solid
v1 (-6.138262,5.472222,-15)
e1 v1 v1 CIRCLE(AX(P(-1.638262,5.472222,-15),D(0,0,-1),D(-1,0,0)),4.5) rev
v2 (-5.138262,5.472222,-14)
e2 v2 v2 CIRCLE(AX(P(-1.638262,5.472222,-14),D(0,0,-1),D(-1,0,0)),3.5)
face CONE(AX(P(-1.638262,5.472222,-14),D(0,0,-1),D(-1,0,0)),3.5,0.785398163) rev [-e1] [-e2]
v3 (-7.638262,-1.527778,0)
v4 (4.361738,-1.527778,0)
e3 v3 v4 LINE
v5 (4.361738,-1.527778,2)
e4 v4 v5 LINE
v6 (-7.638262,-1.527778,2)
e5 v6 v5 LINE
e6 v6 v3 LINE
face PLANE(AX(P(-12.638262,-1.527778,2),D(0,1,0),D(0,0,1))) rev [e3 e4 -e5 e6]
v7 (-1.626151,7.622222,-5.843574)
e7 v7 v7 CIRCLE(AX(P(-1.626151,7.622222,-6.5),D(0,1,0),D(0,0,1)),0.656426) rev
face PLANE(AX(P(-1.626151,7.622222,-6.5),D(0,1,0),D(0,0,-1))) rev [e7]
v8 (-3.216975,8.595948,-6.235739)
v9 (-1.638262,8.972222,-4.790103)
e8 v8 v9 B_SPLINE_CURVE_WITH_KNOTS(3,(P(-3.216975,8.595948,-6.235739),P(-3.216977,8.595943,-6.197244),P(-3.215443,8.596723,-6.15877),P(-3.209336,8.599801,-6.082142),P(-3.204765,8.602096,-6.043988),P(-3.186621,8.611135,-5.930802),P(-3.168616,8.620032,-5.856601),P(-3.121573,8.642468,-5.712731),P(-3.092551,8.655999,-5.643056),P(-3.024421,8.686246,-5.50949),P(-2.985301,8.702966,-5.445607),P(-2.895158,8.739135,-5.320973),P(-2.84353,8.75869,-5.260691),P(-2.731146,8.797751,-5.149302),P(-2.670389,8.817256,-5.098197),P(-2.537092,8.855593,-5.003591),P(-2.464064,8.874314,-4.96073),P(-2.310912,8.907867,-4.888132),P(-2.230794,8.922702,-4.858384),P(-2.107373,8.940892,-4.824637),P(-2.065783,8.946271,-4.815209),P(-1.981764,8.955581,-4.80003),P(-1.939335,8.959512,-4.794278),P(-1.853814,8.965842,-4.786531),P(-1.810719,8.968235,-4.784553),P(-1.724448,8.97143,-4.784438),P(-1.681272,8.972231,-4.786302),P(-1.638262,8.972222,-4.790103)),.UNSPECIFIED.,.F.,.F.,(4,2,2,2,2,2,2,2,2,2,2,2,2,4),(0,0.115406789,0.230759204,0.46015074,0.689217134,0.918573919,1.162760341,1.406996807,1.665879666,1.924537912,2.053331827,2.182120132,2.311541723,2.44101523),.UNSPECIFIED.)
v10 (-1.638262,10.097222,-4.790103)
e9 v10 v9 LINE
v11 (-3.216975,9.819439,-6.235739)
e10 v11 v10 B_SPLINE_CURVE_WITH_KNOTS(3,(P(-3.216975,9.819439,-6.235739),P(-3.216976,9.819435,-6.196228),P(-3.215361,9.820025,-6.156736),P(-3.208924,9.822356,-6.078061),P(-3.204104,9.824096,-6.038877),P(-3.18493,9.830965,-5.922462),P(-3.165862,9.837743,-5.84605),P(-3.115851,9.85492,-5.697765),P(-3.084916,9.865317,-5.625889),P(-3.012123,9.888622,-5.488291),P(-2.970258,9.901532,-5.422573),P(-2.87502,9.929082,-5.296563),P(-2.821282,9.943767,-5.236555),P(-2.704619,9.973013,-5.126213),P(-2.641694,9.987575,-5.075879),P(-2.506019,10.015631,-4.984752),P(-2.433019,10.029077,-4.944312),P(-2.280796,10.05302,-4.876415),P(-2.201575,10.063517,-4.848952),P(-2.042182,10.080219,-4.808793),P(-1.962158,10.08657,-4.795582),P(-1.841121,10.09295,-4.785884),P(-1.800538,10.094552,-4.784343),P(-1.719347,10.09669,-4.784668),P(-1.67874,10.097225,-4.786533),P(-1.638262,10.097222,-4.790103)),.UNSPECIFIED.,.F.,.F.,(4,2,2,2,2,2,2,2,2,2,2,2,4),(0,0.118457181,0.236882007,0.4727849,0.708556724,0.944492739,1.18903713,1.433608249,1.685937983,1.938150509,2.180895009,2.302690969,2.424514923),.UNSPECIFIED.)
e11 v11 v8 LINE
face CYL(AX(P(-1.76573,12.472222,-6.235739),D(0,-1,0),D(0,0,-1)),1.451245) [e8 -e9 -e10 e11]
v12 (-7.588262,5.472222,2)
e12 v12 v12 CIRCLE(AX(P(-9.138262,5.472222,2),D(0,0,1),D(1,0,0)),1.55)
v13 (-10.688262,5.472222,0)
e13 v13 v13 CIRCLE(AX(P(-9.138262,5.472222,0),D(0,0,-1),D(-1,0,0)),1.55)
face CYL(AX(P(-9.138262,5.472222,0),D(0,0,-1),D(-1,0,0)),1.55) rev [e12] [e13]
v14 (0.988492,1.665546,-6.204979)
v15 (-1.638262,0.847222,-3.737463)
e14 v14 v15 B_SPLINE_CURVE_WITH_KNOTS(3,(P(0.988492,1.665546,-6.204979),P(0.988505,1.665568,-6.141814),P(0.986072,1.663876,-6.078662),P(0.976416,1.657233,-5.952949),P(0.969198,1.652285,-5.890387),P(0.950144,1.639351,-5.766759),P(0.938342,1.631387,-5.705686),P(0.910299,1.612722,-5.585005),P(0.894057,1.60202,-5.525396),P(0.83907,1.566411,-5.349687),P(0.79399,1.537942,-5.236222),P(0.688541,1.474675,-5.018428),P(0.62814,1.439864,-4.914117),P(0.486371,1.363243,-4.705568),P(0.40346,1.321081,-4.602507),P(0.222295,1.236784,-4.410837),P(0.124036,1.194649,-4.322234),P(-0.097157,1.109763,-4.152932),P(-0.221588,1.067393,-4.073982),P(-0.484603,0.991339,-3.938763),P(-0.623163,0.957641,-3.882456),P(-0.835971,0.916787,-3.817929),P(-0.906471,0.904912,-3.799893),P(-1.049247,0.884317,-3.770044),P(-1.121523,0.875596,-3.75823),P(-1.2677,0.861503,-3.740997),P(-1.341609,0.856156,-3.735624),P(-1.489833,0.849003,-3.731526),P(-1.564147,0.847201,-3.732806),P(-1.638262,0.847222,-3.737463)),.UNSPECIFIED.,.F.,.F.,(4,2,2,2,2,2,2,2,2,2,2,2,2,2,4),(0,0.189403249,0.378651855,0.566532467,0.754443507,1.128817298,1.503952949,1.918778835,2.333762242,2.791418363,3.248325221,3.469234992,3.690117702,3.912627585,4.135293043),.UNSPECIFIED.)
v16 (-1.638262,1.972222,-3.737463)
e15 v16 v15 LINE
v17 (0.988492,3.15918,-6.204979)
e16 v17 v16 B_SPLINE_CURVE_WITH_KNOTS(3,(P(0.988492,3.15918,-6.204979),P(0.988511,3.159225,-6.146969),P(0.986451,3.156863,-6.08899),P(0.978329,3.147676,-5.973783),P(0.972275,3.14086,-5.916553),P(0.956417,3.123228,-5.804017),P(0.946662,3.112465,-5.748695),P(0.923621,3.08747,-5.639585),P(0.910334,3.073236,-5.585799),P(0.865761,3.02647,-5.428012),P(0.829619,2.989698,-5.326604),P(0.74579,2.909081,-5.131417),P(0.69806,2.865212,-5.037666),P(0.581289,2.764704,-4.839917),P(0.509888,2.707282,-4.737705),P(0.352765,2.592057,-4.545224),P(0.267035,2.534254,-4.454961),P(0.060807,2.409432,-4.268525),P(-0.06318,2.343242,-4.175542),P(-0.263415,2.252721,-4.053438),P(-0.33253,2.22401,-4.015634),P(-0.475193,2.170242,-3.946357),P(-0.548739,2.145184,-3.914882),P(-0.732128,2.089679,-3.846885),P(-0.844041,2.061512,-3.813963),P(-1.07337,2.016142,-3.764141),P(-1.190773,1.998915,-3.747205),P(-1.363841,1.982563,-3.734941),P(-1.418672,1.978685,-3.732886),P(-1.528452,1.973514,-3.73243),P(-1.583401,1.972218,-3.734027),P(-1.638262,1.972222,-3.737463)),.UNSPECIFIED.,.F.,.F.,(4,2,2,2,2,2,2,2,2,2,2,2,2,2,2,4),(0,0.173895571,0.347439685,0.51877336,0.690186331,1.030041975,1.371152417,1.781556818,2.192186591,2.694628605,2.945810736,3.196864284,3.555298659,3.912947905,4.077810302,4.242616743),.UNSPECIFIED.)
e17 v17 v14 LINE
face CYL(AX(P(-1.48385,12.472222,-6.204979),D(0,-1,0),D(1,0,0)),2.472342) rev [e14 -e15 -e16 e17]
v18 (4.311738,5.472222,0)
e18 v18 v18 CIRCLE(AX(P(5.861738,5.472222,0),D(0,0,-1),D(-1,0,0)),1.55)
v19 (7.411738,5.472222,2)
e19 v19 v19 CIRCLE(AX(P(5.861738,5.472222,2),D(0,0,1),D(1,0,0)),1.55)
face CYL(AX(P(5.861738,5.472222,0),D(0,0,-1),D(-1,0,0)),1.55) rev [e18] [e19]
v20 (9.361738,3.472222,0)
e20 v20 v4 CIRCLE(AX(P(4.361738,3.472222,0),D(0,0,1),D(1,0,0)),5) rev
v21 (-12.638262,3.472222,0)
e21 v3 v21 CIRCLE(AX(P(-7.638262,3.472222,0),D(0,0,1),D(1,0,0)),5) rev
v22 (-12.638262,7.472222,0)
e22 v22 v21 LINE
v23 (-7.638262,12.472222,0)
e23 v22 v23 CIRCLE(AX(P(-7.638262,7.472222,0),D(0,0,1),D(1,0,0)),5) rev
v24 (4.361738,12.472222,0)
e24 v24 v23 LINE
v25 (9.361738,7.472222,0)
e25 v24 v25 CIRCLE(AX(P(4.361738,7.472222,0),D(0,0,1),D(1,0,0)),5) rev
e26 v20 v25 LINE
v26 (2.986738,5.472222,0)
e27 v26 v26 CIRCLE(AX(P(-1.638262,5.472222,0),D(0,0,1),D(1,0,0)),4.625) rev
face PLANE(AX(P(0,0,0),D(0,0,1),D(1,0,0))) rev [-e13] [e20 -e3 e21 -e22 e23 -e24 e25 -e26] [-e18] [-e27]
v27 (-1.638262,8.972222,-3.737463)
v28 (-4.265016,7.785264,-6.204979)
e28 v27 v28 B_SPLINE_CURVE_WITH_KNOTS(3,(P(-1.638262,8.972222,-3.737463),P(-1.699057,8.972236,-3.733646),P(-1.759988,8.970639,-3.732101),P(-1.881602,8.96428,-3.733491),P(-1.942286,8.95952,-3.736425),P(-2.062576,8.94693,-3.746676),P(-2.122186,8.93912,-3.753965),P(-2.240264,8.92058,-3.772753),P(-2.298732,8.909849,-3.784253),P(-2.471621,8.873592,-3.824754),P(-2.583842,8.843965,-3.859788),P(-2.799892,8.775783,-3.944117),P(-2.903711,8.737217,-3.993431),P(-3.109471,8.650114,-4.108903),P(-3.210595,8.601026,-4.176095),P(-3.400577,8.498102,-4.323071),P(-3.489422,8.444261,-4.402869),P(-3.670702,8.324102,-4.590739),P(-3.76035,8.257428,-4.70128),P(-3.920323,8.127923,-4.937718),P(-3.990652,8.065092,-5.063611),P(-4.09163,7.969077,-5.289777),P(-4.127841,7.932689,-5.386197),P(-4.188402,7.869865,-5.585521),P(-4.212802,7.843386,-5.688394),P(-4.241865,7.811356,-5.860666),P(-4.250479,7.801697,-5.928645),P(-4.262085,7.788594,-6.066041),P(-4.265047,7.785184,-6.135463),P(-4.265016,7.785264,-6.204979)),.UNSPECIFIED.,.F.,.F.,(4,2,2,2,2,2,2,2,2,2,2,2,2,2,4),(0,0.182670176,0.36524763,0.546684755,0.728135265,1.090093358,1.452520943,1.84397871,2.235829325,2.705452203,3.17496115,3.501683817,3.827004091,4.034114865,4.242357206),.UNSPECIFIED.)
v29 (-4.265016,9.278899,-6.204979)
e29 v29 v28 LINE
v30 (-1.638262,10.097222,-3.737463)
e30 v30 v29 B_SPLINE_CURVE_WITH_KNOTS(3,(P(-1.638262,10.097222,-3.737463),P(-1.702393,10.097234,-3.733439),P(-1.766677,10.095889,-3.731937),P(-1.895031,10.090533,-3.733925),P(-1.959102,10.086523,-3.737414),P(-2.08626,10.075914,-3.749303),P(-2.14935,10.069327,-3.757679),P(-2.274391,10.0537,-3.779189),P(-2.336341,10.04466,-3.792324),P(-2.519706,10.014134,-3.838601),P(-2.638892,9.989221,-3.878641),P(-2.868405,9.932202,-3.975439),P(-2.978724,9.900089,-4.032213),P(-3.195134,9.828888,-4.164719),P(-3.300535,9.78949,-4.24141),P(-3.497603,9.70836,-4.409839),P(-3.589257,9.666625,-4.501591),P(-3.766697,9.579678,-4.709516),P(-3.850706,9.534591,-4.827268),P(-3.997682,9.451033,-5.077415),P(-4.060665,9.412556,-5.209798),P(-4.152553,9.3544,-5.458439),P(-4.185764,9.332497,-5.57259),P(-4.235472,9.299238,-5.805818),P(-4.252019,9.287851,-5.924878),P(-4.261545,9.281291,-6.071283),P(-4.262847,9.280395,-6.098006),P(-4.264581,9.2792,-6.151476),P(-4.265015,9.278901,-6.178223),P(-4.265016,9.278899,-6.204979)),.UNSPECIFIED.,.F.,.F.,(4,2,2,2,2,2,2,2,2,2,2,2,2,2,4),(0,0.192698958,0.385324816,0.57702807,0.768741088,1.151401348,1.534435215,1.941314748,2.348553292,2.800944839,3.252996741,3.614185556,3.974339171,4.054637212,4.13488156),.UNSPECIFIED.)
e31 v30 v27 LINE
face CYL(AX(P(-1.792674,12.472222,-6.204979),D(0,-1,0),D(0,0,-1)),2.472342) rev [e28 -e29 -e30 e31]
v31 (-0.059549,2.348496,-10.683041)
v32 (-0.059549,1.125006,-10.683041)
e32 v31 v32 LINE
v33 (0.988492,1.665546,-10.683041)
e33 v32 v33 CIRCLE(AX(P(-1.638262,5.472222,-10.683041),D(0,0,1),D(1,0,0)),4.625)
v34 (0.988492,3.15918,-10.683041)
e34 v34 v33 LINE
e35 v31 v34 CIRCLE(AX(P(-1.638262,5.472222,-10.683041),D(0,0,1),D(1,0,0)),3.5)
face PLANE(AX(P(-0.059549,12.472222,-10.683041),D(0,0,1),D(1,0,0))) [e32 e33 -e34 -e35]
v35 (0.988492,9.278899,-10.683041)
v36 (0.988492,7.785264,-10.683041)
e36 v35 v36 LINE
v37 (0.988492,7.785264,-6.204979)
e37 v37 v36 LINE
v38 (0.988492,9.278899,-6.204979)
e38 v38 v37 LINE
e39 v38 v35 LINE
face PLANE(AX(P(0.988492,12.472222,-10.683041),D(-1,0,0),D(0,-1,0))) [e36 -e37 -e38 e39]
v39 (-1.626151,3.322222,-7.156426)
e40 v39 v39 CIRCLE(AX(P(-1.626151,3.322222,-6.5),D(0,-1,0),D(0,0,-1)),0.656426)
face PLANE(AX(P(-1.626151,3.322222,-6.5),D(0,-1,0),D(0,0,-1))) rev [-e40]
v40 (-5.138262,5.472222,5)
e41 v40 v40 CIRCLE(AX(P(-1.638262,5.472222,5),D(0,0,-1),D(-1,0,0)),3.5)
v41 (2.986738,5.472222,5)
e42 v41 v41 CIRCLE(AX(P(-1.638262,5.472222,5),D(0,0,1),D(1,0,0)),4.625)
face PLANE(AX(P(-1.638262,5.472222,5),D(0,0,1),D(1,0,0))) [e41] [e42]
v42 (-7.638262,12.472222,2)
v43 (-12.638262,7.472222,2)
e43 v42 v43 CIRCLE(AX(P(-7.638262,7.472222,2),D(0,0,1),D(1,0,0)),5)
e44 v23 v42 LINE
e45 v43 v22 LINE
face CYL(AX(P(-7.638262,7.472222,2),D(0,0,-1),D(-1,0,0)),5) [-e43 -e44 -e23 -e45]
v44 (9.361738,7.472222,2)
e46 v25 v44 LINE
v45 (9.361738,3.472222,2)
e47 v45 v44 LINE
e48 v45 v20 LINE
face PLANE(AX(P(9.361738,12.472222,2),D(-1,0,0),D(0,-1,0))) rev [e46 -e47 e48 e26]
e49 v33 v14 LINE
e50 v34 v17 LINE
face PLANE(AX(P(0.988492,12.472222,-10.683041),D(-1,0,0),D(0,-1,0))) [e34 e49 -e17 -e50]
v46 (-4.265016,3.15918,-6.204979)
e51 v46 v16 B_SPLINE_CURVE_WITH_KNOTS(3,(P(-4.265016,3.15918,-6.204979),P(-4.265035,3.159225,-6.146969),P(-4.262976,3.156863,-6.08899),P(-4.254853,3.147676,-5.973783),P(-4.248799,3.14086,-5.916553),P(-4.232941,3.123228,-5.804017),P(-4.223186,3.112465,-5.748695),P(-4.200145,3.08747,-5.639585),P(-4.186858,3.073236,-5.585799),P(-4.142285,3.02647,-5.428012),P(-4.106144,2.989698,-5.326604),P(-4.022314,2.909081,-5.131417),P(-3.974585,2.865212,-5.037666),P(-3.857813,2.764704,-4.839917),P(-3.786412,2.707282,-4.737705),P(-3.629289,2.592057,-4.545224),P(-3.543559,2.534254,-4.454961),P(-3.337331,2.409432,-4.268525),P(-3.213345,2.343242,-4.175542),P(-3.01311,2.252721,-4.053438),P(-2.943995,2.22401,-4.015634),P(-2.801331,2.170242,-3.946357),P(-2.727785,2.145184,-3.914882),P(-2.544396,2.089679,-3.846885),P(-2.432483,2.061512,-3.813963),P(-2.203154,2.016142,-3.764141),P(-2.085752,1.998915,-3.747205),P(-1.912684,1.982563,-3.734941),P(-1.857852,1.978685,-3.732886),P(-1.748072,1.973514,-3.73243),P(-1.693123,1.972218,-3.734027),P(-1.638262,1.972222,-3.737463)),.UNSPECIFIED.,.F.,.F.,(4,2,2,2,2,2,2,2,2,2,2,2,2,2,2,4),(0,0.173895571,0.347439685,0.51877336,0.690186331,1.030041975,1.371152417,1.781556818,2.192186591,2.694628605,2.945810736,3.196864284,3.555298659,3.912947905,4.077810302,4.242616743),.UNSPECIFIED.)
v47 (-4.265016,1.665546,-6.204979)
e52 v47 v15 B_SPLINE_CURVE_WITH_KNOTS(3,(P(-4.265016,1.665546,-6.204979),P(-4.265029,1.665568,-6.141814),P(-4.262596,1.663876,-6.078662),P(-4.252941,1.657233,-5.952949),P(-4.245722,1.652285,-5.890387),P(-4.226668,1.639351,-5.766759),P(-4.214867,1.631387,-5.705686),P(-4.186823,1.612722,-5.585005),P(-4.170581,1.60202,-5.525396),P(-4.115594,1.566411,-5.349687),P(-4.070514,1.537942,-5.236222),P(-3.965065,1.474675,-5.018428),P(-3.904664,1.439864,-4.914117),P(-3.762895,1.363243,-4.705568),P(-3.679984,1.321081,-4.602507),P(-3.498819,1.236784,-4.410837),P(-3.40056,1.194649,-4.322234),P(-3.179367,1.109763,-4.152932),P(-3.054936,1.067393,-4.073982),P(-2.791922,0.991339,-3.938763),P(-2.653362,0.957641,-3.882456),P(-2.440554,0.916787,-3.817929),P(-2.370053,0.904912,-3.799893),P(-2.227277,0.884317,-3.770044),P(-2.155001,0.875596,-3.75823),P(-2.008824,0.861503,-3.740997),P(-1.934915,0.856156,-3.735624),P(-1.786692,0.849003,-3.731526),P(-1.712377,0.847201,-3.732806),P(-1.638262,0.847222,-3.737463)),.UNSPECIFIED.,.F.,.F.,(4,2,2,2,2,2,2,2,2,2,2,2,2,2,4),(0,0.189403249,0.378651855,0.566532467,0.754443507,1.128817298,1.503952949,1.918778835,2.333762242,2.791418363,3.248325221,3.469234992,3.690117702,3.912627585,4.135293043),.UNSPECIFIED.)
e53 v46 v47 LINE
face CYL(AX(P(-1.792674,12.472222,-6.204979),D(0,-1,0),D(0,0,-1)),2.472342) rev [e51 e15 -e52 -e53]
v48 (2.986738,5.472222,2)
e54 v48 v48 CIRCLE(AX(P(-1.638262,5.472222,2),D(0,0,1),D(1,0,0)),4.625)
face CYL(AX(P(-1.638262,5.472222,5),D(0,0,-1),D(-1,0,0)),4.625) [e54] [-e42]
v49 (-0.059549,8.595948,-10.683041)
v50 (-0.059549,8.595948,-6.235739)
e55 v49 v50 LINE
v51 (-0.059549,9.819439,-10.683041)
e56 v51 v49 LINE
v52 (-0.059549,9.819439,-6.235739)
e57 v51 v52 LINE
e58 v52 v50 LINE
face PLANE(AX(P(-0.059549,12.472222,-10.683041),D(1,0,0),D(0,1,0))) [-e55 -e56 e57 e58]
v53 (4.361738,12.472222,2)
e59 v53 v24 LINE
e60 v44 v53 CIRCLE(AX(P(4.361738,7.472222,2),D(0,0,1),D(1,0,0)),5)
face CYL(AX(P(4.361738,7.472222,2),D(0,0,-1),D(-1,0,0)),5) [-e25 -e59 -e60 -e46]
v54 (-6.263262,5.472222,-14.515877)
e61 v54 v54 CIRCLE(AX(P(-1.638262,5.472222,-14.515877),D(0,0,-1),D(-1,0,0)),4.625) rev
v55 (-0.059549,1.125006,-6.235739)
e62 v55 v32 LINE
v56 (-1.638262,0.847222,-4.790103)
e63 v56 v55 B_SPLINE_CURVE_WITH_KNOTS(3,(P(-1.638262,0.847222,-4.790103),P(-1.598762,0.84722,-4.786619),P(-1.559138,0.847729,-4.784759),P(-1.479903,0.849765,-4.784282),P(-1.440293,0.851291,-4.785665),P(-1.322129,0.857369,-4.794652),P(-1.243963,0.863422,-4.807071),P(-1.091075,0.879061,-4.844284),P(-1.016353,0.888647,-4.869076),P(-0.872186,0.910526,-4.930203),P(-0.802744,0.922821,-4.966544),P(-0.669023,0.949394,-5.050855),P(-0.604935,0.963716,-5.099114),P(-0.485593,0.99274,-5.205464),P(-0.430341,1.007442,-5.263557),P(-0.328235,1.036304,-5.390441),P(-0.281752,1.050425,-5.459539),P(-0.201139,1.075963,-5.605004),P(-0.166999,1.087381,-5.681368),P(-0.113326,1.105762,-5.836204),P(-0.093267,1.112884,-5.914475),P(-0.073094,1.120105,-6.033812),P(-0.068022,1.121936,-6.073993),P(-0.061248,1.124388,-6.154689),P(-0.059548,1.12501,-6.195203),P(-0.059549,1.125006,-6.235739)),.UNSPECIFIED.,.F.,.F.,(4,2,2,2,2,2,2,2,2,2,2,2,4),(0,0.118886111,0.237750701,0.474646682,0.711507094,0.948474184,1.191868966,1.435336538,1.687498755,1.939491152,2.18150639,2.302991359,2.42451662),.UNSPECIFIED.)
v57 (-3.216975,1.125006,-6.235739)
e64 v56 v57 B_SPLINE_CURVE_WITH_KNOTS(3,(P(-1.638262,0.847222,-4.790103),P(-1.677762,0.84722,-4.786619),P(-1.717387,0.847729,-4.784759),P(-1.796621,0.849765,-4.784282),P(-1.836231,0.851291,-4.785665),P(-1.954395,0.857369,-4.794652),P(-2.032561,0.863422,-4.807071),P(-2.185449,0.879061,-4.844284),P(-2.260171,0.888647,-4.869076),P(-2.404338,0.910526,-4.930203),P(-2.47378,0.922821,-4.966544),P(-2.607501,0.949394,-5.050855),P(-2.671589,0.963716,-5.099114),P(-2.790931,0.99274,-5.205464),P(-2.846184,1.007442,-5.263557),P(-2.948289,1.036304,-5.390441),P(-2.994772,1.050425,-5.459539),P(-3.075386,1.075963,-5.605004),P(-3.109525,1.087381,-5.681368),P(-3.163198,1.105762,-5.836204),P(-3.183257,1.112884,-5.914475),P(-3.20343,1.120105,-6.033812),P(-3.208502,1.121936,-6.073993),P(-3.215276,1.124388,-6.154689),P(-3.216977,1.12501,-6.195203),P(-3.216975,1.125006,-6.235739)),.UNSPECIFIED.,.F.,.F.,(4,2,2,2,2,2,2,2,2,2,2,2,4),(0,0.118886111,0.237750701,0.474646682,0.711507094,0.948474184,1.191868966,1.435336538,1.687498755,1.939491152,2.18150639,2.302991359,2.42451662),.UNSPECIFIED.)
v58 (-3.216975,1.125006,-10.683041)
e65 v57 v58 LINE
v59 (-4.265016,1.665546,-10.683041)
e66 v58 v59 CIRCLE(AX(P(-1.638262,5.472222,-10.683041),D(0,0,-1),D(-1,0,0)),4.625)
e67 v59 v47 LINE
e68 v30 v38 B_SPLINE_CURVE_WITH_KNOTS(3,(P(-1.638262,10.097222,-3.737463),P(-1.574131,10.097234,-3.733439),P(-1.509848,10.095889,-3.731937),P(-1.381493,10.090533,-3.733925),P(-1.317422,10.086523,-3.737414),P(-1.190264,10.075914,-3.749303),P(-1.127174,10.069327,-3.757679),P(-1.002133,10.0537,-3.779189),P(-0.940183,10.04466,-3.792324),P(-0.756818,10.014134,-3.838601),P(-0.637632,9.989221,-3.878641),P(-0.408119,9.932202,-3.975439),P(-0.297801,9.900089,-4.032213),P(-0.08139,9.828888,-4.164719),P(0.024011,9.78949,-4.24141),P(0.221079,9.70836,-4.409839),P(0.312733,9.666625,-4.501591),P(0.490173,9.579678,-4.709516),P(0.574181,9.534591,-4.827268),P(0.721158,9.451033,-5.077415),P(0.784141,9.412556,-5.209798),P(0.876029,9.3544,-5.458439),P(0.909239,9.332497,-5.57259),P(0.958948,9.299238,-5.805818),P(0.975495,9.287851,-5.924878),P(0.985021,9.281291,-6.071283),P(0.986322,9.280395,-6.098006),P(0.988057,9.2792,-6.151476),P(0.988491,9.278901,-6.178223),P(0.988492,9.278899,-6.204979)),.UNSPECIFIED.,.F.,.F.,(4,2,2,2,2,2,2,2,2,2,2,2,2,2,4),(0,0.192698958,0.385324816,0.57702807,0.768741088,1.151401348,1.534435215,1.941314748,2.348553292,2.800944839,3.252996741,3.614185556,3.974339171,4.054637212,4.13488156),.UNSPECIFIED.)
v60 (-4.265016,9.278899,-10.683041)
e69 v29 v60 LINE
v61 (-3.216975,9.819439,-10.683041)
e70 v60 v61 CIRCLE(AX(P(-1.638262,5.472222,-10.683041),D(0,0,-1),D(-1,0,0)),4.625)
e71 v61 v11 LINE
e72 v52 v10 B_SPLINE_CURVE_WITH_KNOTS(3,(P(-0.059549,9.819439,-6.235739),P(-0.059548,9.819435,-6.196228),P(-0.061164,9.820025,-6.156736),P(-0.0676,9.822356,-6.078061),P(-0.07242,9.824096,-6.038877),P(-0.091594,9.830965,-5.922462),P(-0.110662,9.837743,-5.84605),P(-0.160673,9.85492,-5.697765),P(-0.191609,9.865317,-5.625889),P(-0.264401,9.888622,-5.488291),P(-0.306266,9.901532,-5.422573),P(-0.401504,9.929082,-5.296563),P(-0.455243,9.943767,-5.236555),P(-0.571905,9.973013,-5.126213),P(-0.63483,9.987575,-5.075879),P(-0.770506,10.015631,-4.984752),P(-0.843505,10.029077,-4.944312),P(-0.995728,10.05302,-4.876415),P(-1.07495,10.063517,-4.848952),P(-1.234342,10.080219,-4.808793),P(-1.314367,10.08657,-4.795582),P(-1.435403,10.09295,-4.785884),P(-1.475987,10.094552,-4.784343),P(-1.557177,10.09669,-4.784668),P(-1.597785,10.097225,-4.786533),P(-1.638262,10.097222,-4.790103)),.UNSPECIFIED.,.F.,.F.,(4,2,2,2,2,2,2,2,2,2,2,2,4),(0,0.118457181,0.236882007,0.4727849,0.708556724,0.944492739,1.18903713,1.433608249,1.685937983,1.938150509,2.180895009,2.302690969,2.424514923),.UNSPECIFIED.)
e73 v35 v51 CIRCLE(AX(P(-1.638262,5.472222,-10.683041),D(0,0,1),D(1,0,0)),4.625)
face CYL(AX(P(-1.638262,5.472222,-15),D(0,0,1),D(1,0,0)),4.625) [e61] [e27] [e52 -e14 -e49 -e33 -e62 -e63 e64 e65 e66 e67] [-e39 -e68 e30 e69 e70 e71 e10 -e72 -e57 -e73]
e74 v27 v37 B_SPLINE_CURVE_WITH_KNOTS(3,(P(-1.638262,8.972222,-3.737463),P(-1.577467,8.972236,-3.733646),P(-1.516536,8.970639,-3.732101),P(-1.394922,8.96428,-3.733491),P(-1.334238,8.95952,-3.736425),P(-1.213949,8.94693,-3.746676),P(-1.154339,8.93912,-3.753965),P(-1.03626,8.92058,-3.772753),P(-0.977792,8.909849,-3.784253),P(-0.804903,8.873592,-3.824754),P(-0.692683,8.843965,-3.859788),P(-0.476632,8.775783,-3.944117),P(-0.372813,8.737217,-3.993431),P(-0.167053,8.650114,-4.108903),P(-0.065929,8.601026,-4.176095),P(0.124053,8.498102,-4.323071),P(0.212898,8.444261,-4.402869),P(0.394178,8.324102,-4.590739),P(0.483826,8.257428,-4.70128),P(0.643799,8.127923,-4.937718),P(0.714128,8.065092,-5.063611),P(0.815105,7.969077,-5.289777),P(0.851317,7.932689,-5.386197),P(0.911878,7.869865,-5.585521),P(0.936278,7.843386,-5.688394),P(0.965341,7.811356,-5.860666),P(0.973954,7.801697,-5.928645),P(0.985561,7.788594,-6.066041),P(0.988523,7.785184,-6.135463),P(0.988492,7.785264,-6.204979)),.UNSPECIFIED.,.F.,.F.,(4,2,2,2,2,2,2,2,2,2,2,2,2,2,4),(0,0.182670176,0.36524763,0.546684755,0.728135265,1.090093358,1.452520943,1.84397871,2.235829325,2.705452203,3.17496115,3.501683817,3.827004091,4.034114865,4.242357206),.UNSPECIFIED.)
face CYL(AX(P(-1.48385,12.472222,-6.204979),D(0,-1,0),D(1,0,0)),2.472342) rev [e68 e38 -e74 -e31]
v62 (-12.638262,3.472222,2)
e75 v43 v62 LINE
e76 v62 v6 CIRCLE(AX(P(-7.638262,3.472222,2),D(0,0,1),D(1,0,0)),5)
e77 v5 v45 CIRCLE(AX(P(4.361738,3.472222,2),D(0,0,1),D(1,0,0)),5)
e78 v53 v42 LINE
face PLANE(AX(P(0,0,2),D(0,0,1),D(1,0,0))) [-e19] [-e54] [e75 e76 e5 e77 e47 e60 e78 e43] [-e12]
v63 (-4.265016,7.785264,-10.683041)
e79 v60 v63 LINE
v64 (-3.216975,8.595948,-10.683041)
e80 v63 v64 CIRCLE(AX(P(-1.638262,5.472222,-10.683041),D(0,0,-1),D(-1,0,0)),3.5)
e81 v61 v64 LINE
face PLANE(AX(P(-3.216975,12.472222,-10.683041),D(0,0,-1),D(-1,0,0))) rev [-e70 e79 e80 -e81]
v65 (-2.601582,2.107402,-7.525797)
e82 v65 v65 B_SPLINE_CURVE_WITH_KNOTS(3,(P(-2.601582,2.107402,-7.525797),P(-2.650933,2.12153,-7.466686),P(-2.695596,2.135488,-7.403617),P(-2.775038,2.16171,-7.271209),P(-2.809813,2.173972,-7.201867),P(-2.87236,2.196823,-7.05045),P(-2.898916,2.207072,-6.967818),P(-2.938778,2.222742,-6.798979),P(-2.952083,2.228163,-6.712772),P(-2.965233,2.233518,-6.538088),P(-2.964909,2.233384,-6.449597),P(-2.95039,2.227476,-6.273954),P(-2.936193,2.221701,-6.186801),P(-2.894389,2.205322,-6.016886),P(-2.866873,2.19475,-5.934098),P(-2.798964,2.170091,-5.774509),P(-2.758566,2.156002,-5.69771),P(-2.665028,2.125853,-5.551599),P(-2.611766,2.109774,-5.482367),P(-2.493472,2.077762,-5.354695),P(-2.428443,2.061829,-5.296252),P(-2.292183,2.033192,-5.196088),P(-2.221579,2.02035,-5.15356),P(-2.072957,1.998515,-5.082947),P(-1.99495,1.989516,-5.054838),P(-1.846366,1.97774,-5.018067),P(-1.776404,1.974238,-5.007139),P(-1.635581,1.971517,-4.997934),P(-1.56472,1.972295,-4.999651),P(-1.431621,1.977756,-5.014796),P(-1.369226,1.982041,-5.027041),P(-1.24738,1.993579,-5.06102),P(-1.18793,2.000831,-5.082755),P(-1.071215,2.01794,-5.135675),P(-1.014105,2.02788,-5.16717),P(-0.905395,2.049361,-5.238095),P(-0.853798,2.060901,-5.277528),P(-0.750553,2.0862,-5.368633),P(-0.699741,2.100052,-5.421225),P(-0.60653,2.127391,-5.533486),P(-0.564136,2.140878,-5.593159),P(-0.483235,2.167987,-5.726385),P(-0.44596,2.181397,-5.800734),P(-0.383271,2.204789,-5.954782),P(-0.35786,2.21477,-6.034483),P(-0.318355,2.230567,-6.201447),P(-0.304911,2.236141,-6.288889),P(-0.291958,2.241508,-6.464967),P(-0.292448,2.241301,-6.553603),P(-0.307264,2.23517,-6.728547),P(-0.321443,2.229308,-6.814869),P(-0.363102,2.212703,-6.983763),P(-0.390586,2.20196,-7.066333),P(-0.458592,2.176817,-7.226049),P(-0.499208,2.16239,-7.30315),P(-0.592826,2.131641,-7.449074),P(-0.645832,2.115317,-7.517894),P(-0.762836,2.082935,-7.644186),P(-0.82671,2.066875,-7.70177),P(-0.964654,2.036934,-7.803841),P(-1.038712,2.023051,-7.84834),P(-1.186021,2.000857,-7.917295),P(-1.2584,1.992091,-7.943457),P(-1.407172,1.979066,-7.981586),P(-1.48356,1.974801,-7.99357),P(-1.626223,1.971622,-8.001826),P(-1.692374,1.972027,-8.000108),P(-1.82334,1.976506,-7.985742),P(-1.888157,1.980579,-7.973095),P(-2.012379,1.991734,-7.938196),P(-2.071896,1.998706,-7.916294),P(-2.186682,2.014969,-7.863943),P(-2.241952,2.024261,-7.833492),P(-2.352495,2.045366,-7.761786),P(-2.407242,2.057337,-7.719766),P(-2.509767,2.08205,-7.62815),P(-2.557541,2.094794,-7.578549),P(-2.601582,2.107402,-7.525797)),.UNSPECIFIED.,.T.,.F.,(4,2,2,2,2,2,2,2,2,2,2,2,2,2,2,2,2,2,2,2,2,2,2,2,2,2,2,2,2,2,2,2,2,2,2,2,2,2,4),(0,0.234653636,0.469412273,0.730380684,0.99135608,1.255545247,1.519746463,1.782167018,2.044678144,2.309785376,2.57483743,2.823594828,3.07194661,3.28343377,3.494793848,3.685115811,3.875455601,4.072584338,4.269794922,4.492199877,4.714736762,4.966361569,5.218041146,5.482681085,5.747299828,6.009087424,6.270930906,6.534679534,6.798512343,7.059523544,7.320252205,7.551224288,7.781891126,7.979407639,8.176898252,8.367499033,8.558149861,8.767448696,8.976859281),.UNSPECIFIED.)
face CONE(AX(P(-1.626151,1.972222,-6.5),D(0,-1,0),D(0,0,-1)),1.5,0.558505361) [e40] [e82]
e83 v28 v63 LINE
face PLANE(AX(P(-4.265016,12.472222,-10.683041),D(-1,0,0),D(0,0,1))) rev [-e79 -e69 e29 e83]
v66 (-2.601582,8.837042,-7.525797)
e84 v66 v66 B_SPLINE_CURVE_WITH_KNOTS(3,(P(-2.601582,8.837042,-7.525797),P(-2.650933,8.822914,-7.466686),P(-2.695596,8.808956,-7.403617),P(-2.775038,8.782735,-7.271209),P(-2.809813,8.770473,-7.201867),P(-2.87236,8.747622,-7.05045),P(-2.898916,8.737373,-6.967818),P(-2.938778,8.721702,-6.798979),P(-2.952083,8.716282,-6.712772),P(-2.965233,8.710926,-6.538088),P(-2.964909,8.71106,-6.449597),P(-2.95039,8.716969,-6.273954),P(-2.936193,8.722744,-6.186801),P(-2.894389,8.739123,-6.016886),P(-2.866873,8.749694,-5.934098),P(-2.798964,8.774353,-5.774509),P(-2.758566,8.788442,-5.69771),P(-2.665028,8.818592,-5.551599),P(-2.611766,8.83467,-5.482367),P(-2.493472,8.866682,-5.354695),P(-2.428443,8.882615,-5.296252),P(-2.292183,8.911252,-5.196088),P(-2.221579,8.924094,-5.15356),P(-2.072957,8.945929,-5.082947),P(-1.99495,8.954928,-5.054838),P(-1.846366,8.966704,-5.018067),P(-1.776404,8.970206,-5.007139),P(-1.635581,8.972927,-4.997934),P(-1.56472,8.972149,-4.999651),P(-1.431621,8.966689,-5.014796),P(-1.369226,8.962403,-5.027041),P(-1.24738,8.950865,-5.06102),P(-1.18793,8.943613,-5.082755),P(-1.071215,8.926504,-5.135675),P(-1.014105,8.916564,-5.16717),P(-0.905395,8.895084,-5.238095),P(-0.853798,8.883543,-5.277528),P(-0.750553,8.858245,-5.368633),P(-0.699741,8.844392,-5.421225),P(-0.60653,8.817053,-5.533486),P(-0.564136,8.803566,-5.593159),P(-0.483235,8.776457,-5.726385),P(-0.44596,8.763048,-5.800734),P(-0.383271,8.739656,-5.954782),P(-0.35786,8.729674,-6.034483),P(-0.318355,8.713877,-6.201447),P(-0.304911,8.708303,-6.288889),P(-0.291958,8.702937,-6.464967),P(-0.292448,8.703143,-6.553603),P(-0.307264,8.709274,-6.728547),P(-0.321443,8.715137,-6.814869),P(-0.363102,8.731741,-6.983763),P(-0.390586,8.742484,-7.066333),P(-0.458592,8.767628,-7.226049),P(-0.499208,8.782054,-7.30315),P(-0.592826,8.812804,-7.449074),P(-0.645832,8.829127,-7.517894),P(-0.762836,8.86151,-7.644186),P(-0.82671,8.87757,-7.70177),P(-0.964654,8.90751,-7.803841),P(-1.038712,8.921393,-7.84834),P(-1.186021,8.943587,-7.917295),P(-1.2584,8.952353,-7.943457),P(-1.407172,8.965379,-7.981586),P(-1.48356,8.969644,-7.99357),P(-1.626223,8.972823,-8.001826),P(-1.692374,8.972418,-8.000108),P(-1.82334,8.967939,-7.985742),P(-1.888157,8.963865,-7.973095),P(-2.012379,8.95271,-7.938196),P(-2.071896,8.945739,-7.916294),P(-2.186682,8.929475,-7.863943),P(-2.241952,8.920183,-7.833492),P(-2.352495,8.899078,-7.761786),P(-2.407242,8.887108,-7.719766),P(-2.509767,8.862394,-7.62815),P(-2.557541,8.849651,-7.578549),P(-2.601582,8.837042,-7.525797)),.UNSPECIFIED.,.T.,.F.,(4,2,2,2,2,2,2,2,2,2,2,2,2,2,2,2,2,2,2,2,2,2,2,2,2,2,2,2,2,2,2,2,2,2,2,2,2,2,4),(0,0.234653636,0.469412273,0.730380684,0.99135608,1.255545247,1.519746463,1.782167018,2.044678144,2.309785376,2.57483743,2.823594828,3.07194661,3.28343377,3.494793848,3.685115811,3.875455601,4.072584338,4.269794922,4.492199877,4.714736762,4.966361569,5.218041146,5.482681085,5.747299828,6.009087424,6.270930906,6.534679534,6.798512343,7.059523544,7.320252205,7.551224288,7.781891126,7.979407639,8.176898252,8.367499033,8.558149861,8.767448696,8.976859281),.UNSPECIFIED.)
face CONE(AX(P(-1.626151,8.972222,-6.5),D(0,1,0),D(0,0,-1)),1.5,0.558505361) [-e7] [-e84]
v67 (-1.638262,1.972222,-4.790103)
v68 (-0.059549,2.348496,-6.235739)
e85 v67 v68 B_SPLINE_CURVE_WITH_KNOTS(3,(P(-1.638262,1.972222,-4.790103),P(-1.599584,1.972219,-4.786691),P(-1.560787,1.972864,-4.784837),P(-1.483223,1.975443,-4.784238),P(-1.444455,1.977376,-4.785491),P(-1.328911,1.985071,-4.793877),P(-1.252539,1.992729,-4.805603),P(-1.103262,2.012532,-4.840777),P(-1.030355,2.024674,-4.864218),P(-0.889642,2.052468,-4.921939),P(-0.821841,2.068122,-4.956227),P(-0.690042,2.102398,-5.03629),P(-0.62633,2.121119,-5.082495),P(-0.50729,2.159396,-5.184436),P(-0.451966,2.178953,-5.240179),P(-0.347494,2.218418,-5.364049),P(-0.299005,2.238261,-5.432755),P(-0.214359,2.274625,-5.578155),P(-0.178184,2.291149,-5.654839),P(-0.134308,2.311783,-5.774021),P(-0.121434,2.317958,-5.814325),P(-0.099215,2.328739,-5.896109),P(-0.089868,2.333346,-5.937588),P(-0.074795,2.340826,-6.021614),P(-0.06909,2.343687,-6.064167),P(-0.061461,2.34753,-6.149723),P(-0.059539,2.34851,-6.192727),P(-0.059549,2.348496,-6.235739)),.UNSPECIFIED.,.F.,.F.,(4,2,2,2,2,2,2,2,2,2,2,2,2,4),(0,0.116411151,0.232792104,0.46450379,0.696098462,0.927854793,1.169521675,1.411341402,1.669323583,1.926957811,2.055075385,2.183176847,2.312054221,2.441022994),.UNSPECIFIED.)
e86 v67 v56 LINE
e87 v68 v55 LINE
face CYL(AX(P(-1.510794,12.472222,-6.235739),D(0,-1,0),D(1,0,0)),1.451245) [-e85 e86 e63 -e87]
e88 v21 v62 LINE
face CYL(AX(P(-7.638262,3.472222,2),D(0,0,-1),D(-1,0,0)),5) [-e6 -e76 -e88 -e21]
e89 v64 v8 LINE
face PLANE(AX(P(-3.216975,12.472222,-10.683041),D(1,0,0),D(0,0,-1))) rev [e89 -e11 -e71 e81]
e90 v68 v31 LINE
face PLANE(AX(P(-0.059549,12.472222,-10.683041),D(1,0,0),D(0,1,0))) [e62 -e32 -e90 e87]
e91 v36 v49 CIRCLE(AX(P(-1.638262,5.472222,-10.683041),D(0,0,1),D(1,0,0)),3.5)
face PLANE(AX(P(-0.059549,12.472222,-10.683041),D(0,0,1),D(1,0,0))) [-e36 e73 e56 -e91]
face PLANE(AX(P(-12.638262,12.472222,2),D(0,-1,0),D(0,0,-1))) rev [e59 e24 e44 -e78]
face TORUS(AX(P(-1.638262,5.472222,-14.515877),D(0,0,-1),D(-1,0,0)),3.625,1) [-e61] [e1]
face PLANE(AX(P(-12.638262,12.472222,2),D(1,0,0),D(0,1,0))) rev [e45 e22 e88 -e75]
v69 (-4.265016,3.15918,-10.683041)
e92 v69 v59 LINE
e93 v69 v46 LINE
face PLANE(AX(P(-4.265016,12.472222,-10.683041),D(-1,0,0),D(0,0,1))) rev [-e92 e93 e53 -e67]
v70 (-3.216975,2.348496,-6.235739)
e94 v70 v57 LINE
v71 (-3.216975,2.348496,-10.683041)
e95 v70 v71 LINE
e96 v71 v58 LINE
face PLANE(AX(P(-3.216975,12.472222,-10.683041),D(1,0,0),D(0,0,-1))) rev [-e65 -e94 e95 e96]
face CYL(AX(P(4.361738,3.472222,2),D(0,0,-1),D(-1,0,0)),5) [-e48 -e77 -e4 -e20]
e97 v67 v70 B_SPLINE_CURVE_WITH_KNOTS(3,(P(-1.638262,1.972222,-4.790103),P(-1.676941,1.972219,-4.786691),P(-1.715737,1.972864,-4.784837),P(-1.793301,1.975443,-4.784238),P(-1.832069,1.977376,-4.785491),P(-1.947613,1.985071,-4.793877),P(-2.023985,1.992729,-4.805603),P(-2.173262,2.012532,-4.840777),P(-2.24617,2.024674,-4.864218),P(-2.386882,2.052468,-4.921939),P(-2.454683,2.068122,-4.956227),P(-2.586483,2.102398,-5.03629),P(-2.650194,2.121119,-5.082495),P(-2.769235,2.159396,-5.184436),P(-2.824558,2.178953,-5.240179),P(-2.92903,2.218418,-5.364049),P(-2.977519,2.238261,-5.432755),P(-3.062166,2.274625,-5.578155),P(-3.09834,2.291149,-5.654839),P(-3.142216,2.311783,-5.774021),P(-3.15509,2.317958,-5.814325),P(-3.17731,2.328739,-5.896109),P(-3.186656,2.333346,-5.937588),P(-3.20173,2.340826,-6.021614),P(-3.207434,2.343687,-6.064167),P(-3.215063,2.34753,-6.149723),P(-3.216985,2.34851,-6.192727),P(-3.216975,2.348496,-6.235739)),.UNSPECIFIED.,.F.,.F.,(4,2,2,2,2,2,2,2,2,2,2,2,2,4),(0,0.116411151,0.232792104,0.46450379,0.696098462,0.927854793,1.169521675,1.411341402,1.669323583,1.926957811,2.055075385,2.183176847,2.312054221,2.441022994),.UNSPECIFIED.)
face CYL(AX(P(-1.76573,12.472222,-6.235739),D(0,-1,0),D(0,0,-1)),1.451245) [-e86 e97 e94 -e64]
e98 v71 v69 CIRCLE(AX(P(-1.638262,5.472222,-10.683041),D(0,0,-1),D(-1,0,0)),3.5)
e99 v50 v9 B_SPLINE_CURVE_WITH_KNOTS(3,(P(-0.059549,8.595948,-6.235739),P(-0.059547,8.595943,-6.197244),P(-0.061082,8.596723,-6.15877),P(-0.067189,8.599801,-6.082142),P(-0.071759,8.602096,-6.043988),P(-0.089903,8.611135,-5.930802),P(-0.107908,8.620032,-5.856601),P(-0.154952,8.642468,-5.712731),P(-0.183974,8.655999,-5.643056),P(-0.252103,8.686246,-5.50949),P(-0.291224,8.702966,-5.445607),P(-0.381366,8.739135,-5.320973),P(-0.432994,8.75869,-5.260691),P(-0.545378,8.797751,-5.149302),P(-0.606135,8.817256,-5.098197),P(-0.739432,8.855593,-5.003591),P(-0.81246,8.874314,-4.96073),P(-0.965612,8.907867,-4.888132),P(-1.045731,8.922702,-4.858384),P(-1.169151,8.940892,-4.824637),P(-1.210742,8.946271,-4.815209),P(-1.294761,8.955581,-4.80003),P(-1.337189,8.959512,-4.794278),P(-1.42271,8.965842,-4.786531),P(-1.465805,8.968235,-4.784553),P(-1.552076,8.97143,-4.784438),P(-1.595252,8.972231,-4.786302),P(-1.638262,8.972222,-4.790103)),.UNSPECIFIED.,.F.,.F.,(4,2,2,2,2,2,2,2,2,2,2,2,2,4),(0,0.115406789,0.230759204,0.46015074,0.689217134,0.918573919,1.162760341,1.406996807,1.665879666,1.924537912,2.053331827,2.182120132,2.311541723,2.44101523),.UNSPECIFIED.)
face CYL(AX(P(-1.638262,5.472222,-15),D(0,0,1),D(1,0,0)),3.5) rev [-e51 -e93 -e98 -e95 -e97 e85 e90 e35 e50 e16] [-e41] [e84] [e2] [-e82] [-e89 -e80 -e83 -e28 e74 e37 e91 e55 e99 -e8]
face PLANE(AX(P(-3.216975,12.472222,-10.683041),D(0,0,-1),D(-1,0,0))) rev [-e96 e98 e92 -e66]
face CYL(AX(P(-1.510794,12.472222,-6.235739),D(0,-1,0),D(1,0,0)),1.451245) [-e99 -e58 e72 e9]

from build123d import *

# Parameters (mm, degrees)
ESQUISSE1_W               = 22
ESQUISSE1_H               = 14
BOSS_EXTRU_1_DEPTH        = 2
ESQUISSE3_R               = 4.625
ESQUISSE3_R_2             = 3.5
BOSS_EXTRU_2_DEPTH        = 15
BOSS_EXTRU_3_START        = 3
ESQUISSE5_R               = 4.625
BOSS_EXTRU_3_DEPTH        = 3
ESQUISSE4_R               = 3.5
ENL_V_MAT_EXTRU_1_DEPTH   = 24.243966888
ENL_V_MAT_EXTRU_2_DEPTH   = 21.826081473
CONG_1_R                  = 5
D_GAGEMENT_M2_51_D        = 3.1
D_GAGEMENT_M2_51_DEPTH    = 18.17
D_GAGEMENT_M2_51_TIP      = 0.931333959
CHANFREIN1_SIZE           = 1
CONG_2_R                  = 1
ESQUISSE12_R              = 1.5
BOSS_EXTRU_4_DEPTH        = 1.35
BOSS_EXTRU_4_DRAFT        = -32
SYM_TRIE2_COPY_1_SKETCH_R = 1.5
SYM_TRIE2_COPY_1_DEPTH    = 1.35
SYM_TRIE2_COPY_1_DRAFT    = -32


with BuildPart() as part:
    # Esquisse1 → Boss.-Extru.1 (new body)
    with BuildSketch(Plane.XY):
        with Locations((-1.638262124, 5.472222222)):
            Rectangle(ESQUISSE1_W, ESQUISSE1_H)
    extrude(amount=BOSS_EXTRU_1_DEPTH)

    # Esquisse3 → Boss.-Extru.2 (add)
    with BuildSketch(Plane(origin=(0, 0, 0), x_dir=(-1, 0, 0), z_dir=(0, 0, -1))):
        with Locations(Location((1.638262124, 5.472222222, 0), (0, 0, 180))):
            Circle(ESQUISSE3_R)
        with Locations((1.638262124, 5.472222222)):
            Circle(ESQUISSE3_R_2, mode=Mode.SUBTRACT)
    extrude(amount=BOSS_EXTRU_2_DEPTH)

    # Esquisse5 → Boss.-Extru.3 (add)
    with BuildSketch(Plane.XY.offset(2).offset(BOSS_EXTRU_3_START)):
        with Locations((-1.638262124, 5.472222222)):
            Circle(ESQUISSE5_R)
    extrude(amount=-BOSS_EXTRU_3_DEPTH)

    # Esquisse4 → Enlèv. mat.-Extru.1 (cut, through all)
    with BuildSketch(Plane(origin=(0, 0, 0), x_dir=(-1, 0, 0), z_dir=(0, 0, -1))):
        with Locations((1.638262124, 5.472222222)):
            Circle(ESQUISSE4_R)
    extrude(amount=-ENL_V_MAT_EXTRU_1_DEPTH, mode=Mode.SUBTRACT)

    # Esquisse6 → Enlèv. mat.-Extru.2 (cut, symmetric)
    with BuildSketch(Plane(origin=(0, 5.472222222, 0), x_dir=(-1, 0, 0), z_dir=(0, -1, 0))):
        with BuildLine():
            Line((3.21697524, 10.683041), (4.265016312, 10.683041))
            Line((4.265016312, 10.683041), (4.265016312, 6.204978645))
            ThreePointArc((4.265016312, 6.204978645), (3.485411067, 4.403002531), (1.638262124, 3.737462868))
            Line((1.638262124, 3.737462868), (1.638262124, 4.790102764))
            ThreePointArc((1.638262124, 4.790102764), (2.74581304, 5.165435363), (3.21697524, 6.235738952))
            Line((3.21697524, 6.235738952), (3.21697524, 10.683041))
        make_face()
    enl_v_mat_extru_2 = extrude(amount=ENL_V_MAT_EXTRU_2_DEPTH, both=True, mode=Mode.SUBTRACT)

    # Symétrie1: Enlèv. mat.-Extru.2 across plane
    add(enl_v_mat_extru_2.mirror(Plane.ZY.offset(1.638262124)), mode=Mode.SUBTRACT)

    # Congé1
    cong_1_edges = [part.edges().sort_by_distance(p)[0] for p in [
        (-12.638262124, 12.472222222, 1),
        (9.361737876, 12.472222222, 1),
        (9.361737876, -1.527777778, 1),
        (-12.638262124, -1.527777778, 1),
    ]]
    fillet(cong_1_edges, radius=CONG_1_R)

    # Dégagement M2.51
    with Locations(Plane(origin=(0, 0, 0), x_dir=(-1, 0, 0), z_dir=(0, 0, -1))):
        with Locations((-5.861737876, 5.472222222), (9.138262124, 5.472222222)):
            Hole(D_GAGEMENT_M2_51_D / 2, depth=D_GAGEMENT_M2_51_DEPTH)
            with Locations((0, 0, -(D_GAGEMENT_M2_51_DEPTH + D_GAGEMENT_M2_51_TIP / 2))):  # 118° drill point
                Cone(0, D_GAGEMENT_M2_51_D / 2, D_GAGEMENT_M2_51_TIP, mode=Mode.SUBTRACT)

    # Chanfrein1
    chanfrein1_edges = [part.edges().sort_by_distance(p)[0] for p in [
        (1.861737876, 5.472222222, -15),
    ]]
    chamfer(chanfrein1_edges, length=CHANFREIN1_SIZE)

    # Congé2
    # the kernel refuses this fillet: 1 mm, written as the material it takes off along each edge
    with BuildSketch(Plane(origin=(-1.638262124, 5.472222222, -15), x_dir=(1, 0, 0), z_dir=(0, 1, 0))) as cong_2_piece_1:
        with BuildLine():
            CenterArc((3.625, -0.484122918), CONG_2_R, 0, 28.955024372)
            Line((4.625, -0.484122918), (4.645, -0.484122918))
            Line((4.645, -0.484122918), (4.645, 0))
            Line((4.645, 0), (4.625, 0.02))
            ThreePointArc((4.625, 0.02), (4.5625, 0.02), (4.5175, 0.009682458))
            Line((4.5175, 0.009682458), (4.5, 0))
        make_face()
    revolve(axis=Axis((-1.638262124, 5.472222222, -15), (0, 0, -1)), mode=Mode.SUBTRACT)


with BuildPart() as boss_extru_4_tool:
    # Esquisse12 → Boss.-Extru.4 (with draft: the straight prism first)
    with BuildSketch(Plane(origin=(0, 1.972222222, 0), x_dir=(-1, 0, 0), z_dir=(0, -1, 0))):
        with Locations((1.626150822, 6.5)):
            Circle(ESQUISSE12_R)
    extrude(amount=-BOSS_EXTRU_4_DEPTH)
    # Boss.-Extru.4: the draft: its side faces are tilted about the plane it starts from
    boss_extru_4_sides = [boss_extru_4_tool.faces().sort_by_distance(p)[0] for p in [
        (-0.126150822, 2.647222222, -6.5),
    ]]
    draft(boss_extru_4_sides, Plane(origin=(0, 1.972222222, 0), x_dir=(-1, 0, 0), z_dir=(0, -1, 0)), BOSS_EXTRU_4_DRAFT)


with BuildPart() as part_1:
    add(part.part)

    # Boss.-Extru.4: add boss_extru_4_tool
    add(boss_extru_4_tool.part)


with BuildPart() as sym_trie2_copy_1_tool:
    # Symétrie2 copy 1 sketch → Symétrie2 copy 1 (with draft: the straight prism first)
    with BuildSketch(Plane(origin=(0, 8.972222222, 0), x_dir=(-1, 0, 0), z_dir=(0, 1, 0))):
        with Locations((1.626150822, -6.5)):
            Circle(SYM_TRIE2_COPY_1_SKETCH_R)
    extrude(amount=-SYM_TRIE2_COPY_1_DEPTH)
    # Symétrie2 copy 1: the draft: its side faces are tilted about the plane it starts from
    sym_trie2_copy_1_sides = [sym_trie2_copy_1_tool.faces().sort_by_distance(p)[0] for p in [
        (-0.126150822, 8.297222222, -6.5),
    ]]
    draft(sym_trie2_copy_1_sides, Plane(origin=(0, 8.972222222, 0), x_dir=(-1, 0, 0), z_dir=(0, 1, 0)), SYM_TRIE2_COPY_1_DRAFT)


with BuildPart() as part_2:
    add(part_1.part)

    # Symétrie2 copy 1: add sym_trie2_copy_1_tool
    add(sym_trie2_copy_1_tool.part)


solid = part_2.part
